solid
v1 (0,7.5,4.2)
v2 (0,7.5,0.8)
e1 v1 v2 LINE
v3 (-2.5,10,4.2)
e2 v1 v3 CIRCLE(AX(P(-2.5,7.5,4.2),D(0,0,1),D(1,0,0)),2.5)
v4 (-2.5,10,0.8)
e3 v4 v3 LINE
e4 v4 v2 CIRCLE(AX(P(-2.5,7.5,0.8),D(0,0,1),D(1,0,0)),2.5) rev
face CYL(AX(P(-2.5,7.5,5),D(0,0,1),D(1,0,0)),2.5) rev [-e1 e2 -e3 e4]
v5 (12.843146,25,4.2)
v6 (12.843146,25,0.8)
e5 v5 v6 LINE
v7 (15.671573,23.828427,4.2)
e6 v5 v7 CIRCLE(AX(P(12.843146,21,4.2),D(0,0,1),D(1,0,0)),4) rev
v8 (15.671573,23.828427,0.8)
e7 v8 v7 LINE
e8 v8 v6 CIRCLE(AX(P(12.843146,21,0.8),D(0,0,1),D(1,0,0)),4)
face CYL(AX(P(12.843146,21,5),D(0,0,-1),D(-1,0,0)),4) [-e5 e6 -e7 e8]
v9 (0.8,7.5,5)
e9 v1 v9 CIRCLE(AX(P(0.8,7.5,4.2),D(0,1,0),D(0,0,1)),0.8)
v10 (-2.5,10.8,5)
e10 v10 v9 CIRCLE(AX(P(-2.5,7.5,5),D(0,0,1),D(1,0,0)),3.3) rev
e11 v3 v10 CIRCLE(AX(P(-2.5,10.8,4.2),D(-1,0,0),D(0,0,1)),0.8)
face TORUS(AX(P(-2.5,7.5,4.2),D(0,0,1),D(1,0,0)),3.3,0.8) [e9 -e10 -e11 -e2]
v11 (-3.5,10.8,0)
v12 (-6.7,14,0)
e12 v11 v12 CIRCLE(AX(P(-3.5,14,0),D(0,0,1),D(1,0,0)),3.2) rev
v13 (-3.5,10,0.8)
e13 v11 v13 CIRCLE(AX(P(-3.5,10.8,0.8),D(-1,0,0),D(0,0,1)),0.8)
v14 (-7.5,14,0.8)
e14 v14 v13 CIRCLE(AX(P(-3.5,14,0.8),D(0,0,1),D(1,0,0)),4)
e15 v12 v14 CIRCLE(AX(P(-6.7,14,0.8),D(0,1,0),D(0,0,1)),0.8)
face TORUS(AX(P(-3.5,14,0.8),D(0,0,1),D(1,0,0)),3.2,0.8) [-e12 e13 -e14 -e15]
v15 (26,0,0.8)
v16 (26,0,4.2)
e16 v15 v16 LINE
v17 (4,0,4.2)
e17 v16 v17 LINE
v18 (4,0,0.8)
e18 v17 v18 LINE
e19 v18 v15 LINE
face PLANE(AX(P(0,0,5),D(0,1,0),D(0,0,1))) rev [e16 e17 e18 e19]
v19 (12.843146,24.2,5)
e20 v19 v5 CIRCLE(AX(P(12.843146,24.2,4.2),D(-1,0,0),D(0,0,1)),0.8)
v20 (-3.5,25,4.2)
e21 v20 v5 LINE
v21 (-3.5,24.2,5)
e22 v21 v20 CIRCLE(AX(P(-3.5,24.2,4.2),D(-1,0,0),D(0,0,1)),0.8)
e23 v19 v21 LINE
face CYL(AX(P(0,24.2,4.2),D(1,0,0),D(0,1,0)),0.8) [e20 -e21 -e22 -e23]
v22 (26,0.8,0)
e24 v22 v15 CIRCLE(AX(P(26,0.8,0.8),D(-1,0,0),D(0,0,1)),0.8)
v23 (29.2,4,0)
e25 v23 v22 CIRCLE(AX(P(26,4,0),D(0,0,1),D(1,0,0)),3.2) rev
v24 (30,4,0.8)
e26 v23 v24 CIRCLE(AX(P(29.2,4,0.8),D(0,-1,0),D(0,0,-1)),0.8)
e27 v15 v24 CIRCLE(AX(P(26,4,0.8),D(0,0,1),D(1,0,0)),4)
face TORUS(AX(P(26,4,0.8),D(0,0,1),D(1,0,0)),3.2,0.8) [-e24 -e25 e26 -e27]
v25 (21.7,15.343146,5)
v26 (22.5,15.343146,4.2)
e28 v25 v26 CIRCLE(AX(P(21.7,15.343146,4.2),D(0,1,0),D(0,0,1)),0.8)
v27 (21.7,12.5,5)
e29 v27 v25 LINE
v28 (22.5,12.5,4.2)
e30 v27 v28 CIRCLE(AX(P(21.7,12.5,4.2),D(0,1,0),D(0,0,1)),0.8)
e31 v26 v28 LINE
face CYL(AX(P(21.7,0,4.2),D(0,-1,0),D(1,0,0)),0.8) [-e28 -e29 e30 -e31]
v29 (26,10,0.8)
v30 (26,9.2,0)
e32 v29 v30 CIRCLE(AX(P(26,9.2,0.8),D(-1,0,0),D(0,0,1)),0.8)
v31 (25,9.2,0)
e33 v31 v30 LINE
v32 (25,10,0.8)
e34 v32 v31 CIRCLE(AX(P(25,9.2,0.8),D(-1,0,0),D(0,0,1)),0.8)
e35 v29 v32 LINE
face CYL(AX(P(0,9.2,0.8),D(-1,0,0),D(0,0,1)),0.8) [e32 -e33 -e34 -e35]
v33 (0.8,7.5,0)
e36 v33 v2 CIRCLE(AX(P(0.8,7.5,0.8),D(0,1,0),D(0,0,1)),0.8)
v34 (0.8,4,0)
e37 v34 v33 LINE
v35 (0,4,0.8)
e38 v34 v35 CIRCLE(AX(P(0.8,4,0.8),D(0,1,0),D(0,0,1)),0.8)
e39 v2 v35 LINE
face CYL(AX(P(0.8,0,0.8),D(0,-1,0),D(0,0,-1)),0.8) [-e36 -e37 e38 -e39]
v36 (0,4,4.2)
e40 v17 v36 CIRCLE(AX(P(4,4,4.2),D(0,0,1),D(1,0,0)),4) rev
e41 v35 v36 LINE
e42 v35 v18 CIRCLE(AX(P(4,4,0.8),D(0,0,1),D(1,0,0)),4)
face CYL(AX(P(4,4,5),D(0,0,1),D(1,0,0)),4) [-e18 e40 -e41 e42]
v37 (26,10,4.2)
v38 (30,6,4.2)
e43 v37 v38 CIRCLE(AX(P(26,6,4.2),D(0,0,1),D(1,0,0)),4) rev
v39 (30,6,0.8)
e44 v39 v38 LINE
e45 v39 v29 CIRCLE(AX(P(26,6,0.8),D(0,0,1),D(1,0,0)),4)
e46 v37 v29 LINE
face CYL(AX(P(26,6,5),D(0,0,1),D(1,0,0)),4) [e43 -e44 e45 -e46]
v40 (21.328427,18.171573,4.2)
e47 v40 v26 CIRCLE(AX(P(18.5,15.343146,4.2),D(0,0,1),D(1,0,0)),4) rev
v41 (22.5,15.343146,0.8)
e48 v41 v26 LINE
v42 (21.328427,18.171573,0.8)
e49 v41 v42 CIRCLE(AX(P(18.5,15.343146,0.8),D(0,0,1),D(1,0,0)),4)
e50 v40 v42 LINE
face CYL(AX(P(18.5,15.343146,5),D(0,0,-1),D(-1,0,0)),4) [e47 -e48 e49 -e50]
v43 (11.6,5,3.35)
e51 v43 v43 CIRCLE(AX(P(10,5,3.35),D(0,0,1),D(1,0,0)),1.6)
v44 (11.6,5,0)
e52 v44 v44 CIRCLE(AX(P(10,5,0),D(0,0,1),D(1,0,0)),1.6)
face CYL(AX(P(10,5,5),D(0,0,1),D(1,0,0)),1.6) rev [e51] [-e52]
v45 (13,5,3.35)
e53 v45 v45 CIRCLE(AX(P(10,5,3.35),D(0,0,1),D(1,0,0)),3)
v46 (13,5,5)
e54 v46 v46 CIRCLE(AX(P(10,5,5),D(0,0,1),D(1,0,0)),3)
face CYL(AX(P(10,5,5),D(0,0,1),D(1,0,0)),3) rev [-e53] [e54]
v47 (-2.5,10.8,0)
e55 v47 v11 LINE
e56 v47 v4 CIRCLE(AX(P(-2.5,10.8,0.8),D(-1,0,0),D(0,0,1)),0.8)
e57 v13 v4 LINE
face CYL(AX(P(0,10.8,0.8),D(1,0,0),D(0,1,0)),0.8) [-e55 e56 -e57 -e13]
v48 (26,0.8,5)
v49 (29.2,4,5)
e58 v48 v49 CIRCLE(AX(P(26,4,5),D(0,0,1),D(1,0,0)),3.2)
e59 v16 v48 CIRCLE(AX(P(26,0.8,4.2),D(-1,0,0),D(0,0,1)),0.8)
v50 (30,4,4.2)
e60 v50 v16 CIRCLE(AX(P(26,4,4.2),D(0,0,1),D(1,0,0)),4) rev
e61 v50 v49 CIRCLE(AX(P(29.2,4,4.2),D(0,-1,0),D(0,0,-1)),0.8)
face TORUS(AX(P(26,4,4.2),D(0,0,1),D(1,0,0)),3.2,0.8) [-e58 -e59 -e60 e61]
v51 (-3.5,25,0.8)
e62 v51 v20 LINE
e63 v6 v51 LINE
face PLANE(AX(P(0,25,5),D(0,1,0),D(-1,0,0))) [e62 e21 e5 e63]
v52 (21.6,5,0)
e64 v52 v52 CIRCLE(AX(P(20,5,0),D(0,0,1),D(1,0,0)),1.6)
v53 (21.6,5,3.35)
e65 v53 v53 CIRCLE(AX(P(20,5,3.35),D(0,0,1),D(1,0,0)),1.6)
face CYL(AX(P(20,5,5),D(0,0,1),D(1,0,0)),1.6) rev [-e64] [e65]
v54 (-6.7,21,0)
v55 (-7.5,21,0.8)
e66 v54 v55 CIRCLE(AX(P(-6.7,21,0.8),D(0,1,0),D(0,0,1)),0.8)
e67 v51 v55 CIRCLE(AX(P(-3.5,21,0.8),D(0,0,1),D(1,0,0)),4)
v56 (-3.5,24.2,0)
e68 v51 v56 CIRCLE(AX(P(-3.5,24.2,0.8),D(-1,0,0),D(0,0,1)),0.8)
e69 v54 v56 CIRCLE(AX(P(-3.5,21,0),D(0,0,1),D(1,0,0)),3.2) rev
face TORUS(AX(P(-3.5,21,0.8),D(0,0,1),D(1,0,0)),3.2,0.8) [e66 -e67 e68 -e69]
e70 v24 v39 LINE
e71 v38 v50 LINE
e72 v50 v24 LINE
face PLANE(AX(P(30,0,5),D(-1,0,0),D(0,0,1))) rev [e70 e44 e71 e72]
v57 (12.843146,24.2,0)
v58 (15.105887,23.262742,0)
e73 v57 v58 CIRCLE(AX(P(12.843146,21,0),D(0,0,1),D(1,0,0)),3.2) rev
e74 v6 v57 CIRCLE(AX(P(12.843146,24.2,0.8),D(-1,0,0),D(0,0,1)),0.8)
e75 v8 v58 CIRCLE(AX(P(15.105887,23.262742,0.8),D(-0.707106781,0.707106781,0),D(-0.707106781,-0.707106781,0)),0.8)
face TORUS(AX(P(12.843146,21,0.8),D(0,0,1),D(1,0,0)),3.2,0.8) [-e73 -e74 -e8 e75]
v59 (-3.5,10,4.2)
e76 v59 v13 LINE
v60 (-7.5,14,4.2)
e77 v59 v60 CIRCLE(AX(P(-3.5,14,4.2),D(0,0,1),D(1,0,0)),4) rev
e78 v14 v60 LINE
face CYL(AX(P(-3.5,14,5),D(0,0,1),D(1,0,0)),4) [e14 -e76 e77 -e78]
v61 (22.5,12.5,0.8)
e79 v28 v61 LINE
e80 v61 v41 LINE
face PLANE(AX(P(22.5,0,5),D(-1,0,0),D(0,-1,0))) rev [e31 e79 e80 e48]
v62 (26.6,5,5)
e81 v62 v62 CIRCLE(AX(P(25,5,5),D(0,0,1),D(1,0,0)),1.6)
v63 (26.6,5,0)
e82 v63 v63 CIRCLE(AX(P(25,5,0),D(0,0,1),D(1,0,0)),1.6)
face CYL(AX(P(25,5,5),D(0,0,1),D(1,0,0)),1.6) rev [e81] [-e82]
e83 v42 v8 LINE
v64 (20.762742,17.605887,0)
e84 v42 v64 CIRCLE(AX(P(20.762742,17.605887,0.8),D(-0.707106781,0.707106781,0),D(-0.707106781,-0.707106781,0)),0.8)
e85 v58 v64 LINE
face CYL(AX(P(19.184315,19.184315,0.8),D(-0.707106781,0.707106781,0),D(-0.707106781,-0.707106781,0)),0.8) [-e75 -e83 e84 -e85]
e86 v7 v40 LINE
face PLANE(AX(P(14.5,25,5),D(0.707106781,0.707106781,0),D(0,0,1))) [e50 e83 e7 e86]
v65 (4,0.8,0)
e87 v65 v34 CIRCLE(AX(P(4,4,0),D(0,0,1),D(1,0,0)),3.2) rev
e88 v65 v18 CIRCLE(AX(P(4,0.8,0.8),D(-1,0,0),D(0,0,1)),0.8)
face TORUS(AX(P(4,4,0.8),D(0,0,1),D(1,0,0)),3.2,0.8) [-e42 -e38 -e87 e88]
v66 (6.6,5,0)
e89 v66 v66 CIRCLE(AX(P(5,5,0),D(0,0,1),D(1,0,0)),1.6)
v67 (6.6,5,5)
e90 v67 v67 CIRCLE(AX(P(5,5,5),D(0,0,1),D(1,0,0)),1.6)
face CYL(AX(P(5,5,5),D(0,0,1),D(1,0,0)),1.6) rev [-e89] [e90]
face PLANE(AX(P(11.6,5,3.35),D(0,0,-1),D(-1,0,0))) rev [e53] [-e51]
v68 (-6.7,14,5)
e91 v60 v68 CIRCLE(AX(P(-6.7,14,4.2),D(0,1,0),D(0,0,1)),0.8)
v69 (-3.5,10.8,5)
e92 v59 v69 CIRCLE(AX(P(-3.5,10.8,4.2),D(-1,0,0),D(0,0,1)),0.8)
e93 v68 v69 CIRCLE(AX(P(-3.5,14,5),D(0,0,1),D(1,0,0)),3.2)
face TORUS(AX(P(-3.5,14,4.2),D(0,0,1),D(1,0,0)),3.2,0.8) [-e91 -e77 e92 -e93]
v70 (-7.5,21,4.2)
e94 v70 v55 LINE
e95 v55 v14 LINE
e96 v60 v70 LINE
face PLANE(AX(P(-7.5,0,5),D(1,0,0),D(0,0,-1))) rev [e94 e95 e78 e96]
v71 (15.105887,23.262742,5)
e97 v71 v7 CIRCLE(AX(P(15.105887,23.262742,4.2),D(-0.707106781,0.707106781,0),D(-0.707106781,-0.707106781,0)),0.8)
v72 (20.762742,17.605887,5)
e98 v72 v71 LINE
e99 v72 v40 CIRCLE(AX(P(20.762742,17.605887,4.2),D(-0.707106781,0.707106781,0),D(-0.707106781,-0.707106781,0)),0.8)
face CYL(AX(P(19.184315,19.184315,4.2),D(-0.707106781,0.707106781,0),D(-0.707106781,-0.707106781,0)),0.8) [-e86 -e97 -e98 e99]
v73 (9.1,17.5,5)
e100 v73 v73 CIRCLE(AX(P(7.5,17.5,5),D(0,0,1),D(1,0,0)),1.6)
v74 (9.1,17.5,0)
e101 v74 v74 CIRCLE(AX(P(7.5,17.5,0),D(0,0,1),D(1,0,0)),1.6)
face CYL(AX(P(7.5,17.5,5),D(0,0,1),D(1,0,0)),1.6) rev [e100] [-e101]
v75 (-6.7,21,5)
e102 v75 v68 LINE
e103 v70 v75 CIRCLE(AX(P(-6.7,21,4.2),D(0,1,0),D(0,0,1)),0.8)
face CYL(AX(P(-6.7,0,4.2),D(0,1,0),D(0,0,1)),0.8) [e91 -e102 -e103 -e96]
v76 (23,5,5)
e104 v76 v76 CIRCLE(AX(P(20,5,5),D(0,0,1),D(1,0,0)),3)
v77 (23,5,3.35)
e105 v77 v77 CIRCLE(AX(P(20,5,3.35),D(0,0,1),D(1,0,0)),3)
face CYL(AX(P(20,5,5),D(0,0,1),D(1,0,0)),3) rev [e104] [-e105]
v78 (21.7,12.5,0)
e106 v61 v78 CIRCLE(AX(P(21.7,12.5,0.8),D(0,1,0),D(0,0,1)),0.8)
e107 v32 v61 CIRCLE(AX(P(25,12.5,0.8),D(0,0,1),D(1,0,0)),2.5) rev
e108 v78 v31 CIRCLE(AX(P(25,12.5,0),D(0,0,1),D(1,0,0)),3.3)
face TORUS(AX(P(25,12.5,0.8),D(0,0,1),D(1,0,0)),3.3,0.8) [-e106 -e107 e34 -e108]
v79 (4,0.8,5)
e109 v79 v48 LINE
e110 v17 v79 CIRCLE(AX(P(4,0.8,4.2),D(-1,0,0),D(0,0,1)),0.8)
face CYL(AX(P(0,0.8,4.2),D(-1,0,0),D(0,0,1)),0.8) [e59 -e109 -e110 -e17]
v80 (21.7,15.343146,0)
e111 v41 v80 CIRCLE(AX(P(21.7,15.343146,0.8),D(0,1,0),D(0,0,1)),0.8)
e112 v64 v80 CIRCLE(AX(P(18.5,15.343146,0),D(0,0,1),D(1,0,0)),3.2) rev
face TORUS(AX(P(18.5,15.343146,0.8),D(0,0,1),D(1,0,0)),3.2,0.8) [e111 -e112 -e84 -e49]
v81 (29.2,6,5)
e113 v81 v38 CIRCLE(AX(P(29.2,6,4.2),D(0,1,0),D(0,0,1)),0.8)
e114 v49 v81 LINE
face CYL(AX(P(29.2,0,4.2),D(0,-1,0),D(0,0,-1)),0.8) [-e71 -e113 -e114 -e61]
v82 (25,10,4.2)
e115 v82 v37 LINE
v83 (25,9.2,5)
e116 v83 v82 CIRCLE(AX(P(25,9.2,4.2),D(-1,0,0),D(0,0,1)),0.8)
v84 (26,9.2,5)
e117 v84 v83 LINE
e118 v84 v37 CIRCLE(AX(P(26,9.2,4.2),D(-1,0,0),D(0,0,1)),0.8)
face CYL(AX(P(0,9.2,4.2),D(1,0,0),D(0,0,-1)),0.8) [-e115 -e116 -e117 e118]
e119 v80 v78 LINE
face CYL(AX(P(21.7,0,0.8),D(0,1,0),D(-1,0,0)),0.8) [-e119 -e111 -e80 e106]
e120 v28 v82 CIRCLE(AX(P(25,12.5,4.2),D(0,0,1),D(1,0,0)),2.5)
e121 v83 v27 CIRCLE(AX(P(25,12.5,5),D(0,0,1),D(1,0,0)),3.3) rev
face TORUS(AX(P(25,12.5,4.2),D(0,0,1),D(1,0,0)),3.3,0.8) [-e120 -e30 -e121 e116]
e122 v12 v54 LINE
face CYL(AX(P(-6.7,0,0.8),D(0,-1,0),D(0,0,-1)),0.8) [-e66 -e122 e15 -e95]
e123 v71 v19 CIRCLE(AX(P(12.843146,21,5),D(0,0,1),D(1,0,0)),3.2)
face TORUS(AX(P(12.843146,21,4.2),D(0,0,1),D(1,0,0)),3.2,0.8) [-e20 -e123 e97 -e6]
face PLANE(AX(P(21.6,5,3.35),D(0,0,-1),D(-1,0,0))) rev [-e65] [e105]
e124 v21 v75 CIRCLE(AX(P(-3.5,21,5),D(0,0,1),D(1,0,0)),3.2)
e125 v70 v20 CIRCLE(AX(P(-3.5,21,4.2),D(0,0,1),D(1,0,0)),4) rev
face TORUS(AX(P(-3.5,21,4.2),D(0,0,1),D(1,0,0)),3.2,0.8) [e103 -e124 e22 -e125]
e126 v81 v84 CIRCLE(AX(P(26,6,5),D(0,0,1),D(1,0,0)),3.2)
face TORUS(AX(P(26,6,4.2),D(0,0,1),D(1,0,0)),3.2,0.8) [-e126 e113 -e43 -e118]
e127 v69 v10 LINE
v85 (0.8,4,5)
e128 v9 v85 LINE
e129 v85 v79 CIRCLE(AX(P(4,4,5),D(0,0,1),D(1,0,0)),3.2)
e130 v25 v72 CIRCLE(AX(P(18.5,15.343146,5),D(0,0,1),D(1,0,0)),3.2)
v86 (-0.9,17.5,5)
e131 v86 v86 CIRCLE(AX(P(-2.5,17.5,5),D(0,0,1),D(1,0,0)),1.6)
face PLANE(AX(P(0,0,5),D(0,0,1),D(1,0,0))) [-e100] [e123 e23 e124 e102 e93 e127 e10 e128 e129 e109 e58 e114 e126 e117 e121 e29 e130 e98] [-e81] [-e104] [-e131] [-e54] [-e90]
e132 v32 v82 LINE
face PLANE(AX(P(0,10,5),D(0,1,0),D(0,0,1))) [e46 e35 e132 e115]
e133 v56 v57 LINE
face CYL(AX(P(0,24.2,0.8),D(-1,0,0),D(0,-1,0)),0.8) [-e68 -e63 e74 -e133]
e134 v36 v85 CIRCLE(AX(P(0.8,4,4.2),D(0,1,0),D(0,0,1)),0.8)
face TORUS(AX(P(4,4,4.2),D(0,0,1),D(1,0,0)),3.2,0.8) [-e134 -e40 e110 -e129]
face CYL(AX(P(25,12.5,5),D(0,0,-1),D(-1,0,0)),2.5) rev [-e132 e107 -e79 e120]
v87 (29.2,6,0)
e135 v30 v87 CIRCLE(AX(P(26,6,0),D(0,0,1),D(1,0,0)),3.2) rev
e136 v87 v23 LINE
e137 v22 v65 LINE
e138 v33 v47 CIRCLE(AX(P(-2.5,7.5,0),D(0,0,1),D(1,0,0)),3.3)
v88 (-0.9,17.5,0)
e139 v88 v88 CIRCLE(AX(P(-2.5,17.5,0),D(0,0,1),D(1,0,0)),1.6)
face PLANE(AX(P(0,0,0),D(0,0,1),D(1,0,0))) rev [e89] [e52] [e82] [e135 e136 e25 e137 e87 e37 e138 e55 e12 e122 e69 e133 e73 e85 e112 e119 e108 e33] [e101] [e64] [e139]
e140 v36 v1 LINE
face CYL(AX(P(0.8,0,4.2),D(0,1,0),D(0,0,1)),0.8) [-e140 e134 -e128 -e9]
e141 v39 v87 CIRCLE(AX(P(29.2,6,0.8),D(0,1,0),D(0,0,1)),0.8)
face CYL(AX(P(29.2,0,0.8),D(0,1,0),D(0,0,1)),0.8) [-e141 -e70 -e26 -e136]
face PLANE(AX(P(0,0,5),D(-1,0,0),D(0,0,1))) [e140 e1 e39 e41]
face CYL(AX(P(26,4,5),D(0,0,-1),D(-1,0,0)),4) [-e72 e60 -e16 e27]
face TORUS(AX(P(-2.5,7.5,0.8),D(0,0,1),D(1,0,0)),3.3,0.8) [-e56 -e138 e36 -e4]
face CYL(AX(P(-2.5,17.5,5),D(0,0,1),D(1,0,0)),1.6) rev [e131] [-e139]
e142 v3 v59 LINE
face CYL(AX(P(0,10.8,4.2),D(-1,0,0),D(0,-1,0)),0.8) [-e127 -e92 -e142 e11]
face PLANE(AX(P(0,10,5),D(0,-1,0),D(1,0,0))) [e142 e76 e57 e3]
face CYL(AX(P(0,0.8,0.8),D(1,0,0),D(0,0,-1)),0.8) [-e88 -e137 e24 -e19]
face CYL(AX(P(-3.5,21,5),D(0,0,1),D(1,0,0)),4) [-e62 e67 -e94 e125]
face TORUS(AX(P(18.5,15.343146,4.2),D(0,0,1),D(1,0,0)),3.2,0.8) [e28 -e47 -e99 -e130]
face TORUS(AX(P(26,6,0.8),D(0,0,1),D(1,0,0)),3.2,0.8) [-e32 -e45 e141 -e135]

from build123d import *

# Parameters (mm, degrees)
SKETCH2_W                       = 15
SKETCH2_H                       = 15
BOSS_EXTRUDE1_DEPTH             = 5
M3_CLEARANCE_HOLE1_OUTLINE_R    = 1.6
M3_CLEARANCE_HOLE1_DEPTH        = 5
CBORE_FOR_M3_SBHCS1_D           = 3.2
CBORE_FOR_M3_SBHCS1_CBORE_D     = 6
CBORE_FOR_M3_SBHCS1_CBORE_DEPTH = 1.65
CHAMFER1_SIZE                   = 8
FILLET1_R                       = 4
FILLET2_R                       = 2.5
FILLET3_R                       = 0.8


# Read off the part's stored shape, not the designer's step: M3 Clearance Hole1
with BuildPart() as part:
    # Sketch2 → Boss-Extrude1 (new body)
    with BuildSketch(Plane.XY):
        Polygon((0, 10), (0, 0), (30, 0), (30, 10), (22.5, 10), (7.5, 10), align=None)
        Polygon((-7.5, 10), (0, 10), (7.5, 10), (7.5, 25), (-7.5, 25), align=None)
        with Locations((15, 17.5)):
            Rectangle(SKETCH2_W, SKETCH2_H)
    extrude(amount=BOSS_EXTRUDE1_DEPTH)

    # M3 Clearance Hole1 outline → M3 Clearance Hole1 (cut)
    with BuildSketch(Plane.XY):
        with Locations((7.5, 17.5)):
            Circle(M3_CLEARANCE_HOLE1_OUTLINE_R)
        with Locations((-2.5, 17.5)):
            Circle(M3_CLEARANCE_HOLE1_OUTLINE_R)
        with Locations((25, 5)):
            Circle(M3_CLEARANCE_HOLE1_OUTLINE_R)
        with Locations((5, 5)):
            Circle(M3_CLEARANCE_HOLE1_OUTLINE_R)
    extrude(amount=M3_CLEARANCE_HOLE1_DEPTH, mode=Mode.SUBTRACT)

    # CBORE for M3 SBHCS1 (through all)
    with Locations(Plane.XY.offset(5)):
        with Locations((20, 5), (10, 5)):
            CounterBoreHole(CBORE_FOR_M3_SBHCS1_D / 2, CBORE_FOR_M3_SBHCS1_CBORE_D / 2, CBORE_FOR_M3_SBHCS1_CBORE_DEPTH)

    # Chamfer1
    chamfer1_edges = [part.edges().sort_by_distance(p)[0] for p in [
        (22.5, 25, 2.5),
    ]]
    chamfer(chamfer1_edges, length=CHAMFER1_SIZE)

    # Fillet1
    fillet1_edges = [part.edges().sort_by_distance(p)[0] for p in [
        (-7.5, 10, 2.5),
        (-7.5, 25, 2.5),
        (30, 10, 2.5),
        (30, 0, 2.5),
        (0, 0, 2.5),
        (14.5, 25, 2.5),
        (22.5, 17, 2.5),
    ]]
    fillet(fillet1_edges, radius=FILLET1_R)

    # Fillet2
    fillet2_edges = [part.edges().sort_by_distance(p)[0] for p in [
        (22.5, 10, 2.5),
        (0, 10, 2.5),
    ]]
    fillet(fillet2_edges, radius=FILLET2_R)

    # Fillet3
    fillet3_edges = [part.edges().sort_by_distance(p)[0] for p in [
        (14.37387948, 24.69551813, 5),
        (22.5, 13.921572875, 0),
        (22.5, 13.921572875, 5),
        (25.5, 10, 5),
        (25.5, 10, 0),
        (-3, 10, 5),
        (-3, 10, 0),
        (23.232233047, 10.732233047, 0),
        (23.232233047, 10.732233047, 5),
        (-0.732233047, 9.267766953, 0),
        (-0.732233047, 9.267766953, 5),
        (4.671572875, 25, 5),
        (4.671572875, 25, 0),
        (18.5, 21, 0),
        (30, 5, 0),
        (15, 0, 0),
        (0, 5.75, 0),
        (-7.5, 17.5, 0),
        (1.171572875, 1.171572875, 0),
        (28.828427125, 1.171572875, 0),
        (28.828427125, 8.828427125, 0),
        (-6.328427125, 11.171572875, 0),
        (-6.328427125, 23.828427125, 0),
        (22.19551813, 16.87387948, 0),
        (14.37387948, 24.69551813, 0),
        (18.5, 21, 5),
        (-7.5, 17.5, 5),
        (0, 5.75, 5),
        (15, 0, 5),
        (30, 5, 5),
        (1.171572875, 1.171572875, 5),
        (28.828427125, 1.171572875, 5),
        (28.828427125, 8.828427125, 5),
        (-6.328427125, 11.171572875, 5),
        (-6.328427125, 23.828427125, 5),
        (22.19551813, 16.87387948, 5),
    ]]
    fillet(fillet3_edges, radius=FILLET3_R)


solid = part.part
